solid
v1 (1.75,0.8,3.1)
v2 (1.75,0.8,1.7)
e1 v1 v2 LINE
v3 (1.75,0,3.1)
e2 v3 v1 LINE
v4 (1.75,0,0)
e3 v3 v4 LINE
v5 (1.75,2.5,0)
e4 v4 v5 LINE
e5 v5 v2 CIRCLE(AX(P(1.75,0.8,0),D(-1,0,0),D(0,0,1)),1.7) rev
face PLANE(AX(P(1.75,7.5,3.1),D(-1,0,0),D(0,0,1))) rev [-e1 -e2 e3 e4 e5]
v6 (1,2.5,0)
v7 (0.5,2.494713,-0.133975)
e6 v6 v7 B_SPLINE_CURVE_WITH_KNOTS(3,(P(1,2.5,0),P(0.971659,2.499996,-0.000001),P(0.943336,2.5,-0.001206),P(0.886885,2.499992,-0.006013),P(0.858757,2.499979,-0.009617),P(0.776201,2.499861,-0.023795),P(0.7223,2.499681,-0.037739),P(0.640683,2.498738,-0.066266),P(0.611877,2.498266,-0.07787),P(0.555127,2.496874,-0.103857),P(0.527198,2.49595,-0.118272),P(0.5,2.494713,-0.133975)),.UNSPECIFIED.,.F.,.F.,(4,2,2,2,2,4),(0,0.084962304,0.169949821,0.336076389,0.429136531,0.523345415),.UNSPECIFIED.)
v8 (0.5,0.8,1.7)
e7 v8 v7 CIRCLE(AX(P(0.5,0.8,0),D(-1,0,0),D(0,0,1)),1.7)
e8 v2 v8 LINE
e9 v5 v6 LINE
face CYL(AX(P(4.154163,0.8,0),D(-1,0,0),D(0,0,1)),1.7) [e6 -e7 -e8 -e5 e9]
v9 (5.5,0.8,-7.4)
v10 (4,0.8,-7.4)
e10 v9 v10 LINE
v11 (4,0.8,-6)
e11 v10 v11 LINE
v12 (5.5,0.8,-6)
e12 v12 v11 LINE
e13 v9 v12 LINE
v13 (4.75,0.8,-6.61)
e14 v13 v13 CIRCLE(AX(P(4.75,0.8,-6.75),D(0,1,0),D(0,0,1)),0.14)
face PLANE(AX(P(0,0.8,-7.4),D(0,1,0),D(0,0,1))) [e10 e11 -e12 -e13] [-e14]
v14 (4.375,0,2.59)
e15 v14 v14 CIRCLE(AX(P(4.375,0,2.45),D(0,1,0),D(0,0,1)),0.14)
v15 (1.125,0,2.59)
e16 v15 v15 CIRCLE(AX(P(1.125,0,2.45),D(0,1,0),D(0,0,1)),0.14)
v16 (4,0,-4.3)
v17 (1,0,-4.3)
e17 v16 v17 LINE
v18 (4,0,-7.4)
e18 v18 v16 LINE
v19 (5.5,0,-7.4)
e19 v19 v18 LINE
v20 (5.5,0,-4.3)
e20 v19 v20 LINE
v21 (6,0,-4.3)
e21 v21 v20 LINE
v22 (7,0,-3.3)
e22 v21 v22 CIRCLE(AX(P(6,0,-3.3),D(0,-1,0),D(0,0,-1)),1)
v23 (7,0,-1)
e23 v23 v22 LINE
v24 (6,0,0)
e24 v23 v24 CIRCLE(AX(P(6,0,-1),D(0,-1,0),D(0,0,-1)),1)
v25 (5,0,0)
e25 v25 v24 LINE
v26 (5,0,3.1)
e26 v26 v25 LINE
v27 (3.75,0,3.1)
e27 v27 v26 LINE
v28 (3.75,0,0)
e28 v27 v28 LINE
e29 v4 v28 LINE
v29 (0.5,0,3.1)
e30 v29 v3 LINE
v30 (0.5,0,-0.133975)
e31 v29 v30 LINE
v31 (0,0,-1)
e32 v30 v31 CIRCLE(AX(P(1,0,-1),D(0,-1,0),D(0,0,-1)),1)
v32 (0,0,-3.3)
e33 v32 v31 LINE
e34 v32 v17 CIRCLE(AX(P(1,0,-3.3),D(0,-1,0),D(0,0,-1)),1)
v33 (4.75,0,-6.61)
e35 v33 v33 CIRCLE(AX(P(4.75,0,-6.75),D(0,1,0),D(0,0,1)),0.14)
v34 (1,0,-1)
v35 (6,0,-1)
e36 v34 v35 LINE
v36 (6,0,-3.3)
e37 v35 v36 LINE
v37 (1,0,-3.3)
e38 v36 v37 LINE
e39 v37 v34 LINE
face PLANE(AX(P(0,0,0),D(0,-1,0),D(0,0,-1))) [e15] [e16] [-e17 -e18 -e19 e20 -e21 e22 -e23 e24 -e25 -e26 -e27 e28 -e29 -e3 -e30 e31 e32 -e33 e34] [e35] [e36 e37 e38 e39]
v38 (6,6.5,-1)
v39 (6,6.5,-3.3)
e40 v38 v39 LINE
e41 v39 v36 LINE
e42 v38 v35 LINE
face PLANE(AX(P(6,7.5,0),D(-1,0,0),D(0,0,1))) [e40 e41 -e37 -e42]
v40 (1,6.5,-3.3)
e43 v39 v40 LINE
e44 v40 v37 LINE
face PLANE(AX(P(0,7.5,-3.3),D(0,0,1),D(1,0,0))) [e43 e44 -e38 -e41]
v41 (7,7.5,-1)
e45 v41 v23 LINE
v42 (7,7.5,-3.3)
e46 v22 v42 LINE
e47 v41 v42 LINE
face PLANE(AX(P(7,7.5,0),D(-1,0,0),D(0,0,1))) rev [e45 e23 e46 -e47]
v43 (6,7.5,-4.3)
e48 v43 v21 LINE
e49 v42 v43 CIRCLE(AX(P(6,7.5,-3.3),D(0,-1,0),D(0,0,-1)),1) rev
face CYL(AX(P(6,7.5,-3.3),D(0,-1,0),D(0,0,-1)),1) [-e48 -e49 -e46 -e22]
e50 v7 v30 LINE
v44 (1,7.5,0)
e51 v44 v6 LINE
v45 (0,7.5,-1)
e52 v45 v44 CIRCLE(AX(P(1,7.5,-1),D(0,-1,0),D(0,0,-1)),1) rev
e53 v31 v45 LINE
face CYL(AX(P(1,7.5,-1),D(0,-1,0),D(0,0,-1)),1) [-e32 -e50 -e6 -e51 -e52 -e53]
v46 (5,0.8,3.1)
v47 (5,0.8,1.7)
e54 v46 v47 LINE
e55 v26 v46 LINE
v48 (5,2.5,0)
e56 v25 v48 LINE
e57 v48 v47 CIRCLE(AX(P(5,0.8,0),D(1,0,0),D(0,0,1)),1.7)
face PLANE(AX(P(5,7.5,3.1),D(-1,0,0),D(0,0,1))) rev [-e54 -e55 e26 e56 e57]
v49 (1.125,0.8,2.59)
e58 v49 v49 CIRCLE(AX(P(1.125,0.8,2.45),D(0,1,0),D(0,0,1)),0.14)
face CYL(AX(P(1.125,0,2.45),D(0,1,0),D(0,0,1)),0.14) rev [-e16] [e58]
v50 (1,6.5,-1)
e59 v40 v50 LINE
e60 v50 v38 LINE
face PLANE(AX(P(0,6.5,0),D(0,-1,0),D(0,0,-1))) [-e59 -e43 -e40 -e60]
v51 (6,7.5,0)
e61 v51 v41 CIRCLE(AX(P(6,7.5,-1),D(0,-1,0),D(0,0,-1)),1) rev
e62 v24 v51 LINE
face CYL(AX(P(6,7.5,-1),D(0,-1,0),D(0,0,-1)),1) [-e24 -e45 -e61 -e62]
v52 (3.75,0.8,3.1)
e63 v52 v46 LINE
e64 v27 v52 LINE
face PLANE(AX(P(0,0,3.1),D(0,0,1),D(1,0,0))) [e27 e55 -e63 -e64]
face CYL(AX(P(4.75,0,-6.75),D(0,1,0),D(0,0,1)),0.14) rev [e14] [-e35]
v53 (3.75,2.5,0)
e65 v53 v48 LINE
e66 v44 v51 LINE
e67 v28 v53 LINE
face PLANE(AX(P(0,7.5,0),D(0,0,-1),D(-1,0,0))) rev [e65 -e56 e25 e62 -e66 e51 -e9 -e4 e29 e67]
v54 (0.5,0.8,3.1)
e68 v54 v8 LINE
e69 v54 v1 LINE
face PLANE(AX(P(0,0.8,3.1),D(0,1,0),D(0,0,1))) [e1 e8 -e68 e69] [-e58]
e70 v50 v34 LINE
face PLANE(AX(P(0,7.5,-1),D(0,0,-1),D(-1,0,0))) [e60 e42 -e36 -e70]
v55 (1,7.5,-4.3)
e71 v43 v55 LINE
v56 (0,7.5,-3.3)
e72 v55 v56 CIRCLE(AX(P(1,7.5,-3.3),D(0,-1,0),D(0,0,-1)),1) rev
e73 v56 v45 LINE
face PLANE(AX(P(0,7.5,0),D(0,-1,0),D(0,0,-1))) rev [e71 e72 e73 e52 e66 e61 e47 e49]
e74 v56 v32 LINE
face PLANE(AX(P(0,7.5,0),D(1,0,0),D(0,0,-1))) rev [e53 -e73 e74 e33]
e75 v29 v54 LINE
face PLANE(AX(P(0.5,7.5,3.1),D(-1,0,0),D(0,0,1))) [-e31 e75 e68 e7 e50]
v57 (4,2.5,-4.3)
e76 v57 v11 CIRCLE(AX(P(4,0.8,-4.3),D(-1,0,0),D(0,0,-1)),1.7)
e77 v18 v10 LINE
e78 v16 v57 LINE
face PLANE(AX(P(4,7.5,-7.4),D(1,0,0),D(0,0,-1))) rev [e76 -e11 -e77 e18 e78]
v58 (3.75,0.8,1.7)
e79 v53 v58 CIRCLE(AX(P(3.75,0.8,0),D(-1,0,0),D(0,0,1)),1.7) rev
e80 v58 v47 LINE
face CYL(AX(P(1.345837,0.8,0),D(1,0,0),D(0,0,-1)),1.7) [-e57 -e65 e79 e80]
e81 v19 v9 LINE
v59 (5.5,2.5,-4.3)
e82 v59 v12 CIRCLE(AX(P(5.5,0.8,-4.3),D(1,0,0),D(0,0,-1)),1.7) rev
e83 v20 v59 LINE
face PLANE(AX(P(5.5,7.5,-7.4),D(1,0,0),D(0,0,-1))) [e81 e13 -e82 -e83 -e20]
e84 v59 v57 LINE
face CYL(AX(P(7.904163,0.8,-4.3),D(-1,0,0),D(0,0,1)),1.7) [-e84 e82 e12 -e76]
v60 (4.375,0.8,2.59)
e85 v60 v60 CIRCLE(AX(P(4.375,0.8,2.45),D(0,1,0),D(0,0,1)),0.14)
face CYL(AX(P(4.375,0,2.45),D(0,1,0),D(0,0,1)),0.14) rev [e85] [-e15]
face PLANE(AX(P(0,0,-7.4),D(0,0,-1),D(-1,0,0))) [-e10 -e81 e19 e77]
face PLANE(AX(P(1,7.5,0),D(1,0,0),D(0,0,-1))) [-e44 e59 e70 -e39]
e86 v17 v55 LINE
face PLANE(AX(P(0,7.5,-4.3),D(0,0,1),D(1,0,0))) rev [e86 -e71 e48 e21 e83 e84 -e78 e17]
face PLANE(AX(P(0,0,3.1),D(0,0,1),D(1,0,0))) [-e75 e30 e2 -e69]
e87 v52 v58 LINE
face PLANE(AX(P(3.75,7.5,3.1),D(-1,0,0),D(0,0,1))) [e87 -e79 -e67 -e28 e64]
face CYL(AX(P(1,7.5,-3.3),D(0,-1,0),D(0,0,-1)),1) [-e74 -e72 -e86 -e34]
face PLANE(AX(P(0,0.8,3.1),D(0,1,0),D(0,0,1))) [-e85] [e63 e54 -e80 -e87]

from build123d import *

# Parameters (mm, degrees)
ESQUISSE1_W             = 7
ESQUISSE1_H             = 4.3
BOSS_EXTRU_1_DEPTH      = 7.5
COQUE1_T                = -1
ESQUISSE2_W             = 1.25
ESQUISSE2_H             = 0.8
BOSS_EXTRU_2_DEPTH      = 3.1
ESQUISSE3_W             = 1.5
ESQUISSE3_H             = 0.8
BOSS_EXTRU_3_DEPTH      = 3.1
ESQUISSE4_R             = 0.14
ENL_V_MAT_EXTRU_1_DEPTH = 13.192210628
BOSS_EXTRU_4_DEPTH      = 1.25
BOSS_EXTRU_5_START      = -1.25
BOSS_EXTRU_5_DEPTH      = 1.25
BOSS_EXTRU_6_DEPTH      = 1.5
CONG_1_R                = 1


with BuildPart() as part:
    # Esquisse1 → Boss.-Extru.1 (new body)
    with BuildSketch(Plane(origin=(0, 0, 0), x_dir=(1, 0, 0), z_dir=(0, 1, 0))):
        with Locations((3.5, 2.15)):
            Rectangle(ESQUISSE1_W, ESQUISSE1_H)
    extrude(amount=BOSS_EXTRU_1_DEPTH)

    # Coque1
    coque1_openings = [part.faces().sort_by_distance(p)[0] for p in [
        (3.5, 0, -2.15),
    ]]
    offset(amount=COQUE1_T, openings=coque1_openings, kind=Kind.INTERSECTION)

    # Esquisse2 → Boss.-Extru.2 (add)
    with BuildSketch(Plane.XY):
        with Locations((1.125, 0.4)):
            Rectangle(ESQUISSE2_W, ESQUISSE2_H)
        with Locations((4.375, 0.4)):
            Rectangle(ESQUISSE2_W, ESQUISSE2_H)
    extrude(amount=BOSS_EXTRU_2_DEPTH)

    # Esquisse3 → Boss.-Extru.3 (add)
    with BuildSketch(Plane(origin=(0, 0, -4.3), x_dir=(-1, 0, 0), z_dir=(0, 0, -1))):
        with Locations((-4.75, 0.4)):
            Rectangle(ESQUISSE3_W, ESQUISSE3_H)
    extrude(amount=BOSS_EXTRU_3_DEPTH)

    # Esquisse4 → Enlèv. mat.-Extru.1 (cut, through all)
    with BuildSketch(Plane(origin=(0, 0.8, 0), x_dir=(1, 0, 0), z_dir=(0, 1, 0))):
        with Locations(Location((4.75, 6.75, 0), (0, 0, 270))):
            Circle(ESQUISSE4_R)
        with Locations(Location((1.125, -2.45, 0), (0, 0, 270))):
            Circle(ESQUISSE4_R)
        with Locations(Location((4.375, -2.45, 0), (0, 0, 270))):
            Circle(ESQUISSE4_R)
    extrude(amount=-ENL_V_MAT_EXTRU_1_DEPTH, mode=Mode.SUBTRACT)

    # Esquisse5 → Boss.-Extru.4 (add)
    with BuildSketch(Plane(origin=(5, 0, 0), x_dir=(0, 0, -1), z_dir=(1, 0, 0))):
        with BuildLine():
            Line((0, 2.5), (0, 0.8))
            Line((0, 0.8), (-1.7, 0.8))
            ThreePointArc((-1.7, 0.8), (-1.202081528, 2.002081528), (0, 2.5))
        make_face()
    extrude(amount=-BOSS_EXTRU_4_DEPTH)

    # Esquisse6 → Boss.-Extru.5 (add)
    with BuildSketch(Plane.ZY.offset(-0.5).offset(BOSS_EXTRU_5_START)):
        with BuildLine():
            Line((0, 2.5), (0, 0.8))
            Line((0, 0.8), (1.7, 0.8))
            ThreePointArc((1.7, 0.8), (1.202081528, 2.002081528), (0, 2.5))
        make_face()
    extrude(amount=BOSS_EXTRU_5_DEPTH)

    # Esquisse7 → Boss.-Extru.6 (add)
    with BuildSketch(Plane.ZY.offset(-4)):
        with BuildLine():
            Line((-4.3, 2.5), (-4.3, 0.8))
            Line((-4.3, 0.8), (-6, 0.8))
            ThreePointArc((-6, 0.8), (-5.502081528, 2.002081528), (-4.3, 2.5))
        make_face()
    extrude(amount=-BOSS_EXTRU_6_DEPTH)

    # Congé1
    # the kernel refuses this fillet: 1 mm, written as the material it takes off along each edge
    with BuildSketch(Plane(origin=(0, -2.5, 0), x_dir=(1, 0, 0), z_dir=(0, 1, 0))) as cong_1_piece_1_section:
        with BuildLine():
            CenterArc((CONG_1_R, CONG_1_R), CONG_1_R, 180, 90)
            Line((0, CONG_1_R), (0, 0))
            Line((0, 0), (CONG_1_R, 0))
        make_face()
    cong_1_piece_1 = extrude(amount=12.5, mode=Mode.PRIVATE)
    cong_1_piece_1 = split(cong_1_piece_1, bisect_by=Plane(origin=(0.5, 1.236097217, -0.241175313), z_dir=(-1, 0, 0)), keep=Keep.TOP, mode=Mode.PRIVATE)
    add(cong_1_piece_1, mode=Mode.SUBTRACT)
    with BuildSketch(Plane(origin=(0, -2.5, 0), x_dir=(1, 0, 0), z_dir=(0, 1, 0))) as cong_1_piece_2_section:
        with BuildLine():
            CenterArc((CONG_1_R, CONG_1_R), CONG_1_R, 180, 90)
            Line((0, CONG_1_R), (0, 0))
            Line((0, 0), (CONG_1_R, 0))
        make_face()
    cong_1_piece_2 = extrude(amount=12.5, mode=Mode.PRIVATE)
    cong_1_piece_2 = cong_1_piece_2 - Plane(origin=(0.623254318, 0.8, 0), x_dir=(0, 0, 1), z_dir=(1, 0, 0)) * Cylinder(1.7, 29, mode=Mode.PRIVATE)
    add(cong_1_piece_2, mode=Mode.SUBTRACT)
    with BuildSketch(Plane(origin=(0, -2.5, -4.3), x_dir=(1, 0, 0), z_dir=(0, 1, 0)), Plane(origin=(7, -2.5, -4.3), x_dir=(0, 0, 1), z_dir=(0, 1, 0)), Plane(origin=(7, -2.5, 0), x_dir=(-1, 0, 0), z_dir=(0, 1, 0))) as cong_1_piece_3:
        with BuildLine():
            CenterArc((CONG_1_R, -CONG_1_R), CONG_1_R, 90, 90)
            Line((0, -CONG_1_R), (0, 0))
            Line((0, 0), (CONG_1_R, 0))
        make_face()
    extrude(amount=12.5, mode=Mode.SUBTRACT)


solid = part.part
